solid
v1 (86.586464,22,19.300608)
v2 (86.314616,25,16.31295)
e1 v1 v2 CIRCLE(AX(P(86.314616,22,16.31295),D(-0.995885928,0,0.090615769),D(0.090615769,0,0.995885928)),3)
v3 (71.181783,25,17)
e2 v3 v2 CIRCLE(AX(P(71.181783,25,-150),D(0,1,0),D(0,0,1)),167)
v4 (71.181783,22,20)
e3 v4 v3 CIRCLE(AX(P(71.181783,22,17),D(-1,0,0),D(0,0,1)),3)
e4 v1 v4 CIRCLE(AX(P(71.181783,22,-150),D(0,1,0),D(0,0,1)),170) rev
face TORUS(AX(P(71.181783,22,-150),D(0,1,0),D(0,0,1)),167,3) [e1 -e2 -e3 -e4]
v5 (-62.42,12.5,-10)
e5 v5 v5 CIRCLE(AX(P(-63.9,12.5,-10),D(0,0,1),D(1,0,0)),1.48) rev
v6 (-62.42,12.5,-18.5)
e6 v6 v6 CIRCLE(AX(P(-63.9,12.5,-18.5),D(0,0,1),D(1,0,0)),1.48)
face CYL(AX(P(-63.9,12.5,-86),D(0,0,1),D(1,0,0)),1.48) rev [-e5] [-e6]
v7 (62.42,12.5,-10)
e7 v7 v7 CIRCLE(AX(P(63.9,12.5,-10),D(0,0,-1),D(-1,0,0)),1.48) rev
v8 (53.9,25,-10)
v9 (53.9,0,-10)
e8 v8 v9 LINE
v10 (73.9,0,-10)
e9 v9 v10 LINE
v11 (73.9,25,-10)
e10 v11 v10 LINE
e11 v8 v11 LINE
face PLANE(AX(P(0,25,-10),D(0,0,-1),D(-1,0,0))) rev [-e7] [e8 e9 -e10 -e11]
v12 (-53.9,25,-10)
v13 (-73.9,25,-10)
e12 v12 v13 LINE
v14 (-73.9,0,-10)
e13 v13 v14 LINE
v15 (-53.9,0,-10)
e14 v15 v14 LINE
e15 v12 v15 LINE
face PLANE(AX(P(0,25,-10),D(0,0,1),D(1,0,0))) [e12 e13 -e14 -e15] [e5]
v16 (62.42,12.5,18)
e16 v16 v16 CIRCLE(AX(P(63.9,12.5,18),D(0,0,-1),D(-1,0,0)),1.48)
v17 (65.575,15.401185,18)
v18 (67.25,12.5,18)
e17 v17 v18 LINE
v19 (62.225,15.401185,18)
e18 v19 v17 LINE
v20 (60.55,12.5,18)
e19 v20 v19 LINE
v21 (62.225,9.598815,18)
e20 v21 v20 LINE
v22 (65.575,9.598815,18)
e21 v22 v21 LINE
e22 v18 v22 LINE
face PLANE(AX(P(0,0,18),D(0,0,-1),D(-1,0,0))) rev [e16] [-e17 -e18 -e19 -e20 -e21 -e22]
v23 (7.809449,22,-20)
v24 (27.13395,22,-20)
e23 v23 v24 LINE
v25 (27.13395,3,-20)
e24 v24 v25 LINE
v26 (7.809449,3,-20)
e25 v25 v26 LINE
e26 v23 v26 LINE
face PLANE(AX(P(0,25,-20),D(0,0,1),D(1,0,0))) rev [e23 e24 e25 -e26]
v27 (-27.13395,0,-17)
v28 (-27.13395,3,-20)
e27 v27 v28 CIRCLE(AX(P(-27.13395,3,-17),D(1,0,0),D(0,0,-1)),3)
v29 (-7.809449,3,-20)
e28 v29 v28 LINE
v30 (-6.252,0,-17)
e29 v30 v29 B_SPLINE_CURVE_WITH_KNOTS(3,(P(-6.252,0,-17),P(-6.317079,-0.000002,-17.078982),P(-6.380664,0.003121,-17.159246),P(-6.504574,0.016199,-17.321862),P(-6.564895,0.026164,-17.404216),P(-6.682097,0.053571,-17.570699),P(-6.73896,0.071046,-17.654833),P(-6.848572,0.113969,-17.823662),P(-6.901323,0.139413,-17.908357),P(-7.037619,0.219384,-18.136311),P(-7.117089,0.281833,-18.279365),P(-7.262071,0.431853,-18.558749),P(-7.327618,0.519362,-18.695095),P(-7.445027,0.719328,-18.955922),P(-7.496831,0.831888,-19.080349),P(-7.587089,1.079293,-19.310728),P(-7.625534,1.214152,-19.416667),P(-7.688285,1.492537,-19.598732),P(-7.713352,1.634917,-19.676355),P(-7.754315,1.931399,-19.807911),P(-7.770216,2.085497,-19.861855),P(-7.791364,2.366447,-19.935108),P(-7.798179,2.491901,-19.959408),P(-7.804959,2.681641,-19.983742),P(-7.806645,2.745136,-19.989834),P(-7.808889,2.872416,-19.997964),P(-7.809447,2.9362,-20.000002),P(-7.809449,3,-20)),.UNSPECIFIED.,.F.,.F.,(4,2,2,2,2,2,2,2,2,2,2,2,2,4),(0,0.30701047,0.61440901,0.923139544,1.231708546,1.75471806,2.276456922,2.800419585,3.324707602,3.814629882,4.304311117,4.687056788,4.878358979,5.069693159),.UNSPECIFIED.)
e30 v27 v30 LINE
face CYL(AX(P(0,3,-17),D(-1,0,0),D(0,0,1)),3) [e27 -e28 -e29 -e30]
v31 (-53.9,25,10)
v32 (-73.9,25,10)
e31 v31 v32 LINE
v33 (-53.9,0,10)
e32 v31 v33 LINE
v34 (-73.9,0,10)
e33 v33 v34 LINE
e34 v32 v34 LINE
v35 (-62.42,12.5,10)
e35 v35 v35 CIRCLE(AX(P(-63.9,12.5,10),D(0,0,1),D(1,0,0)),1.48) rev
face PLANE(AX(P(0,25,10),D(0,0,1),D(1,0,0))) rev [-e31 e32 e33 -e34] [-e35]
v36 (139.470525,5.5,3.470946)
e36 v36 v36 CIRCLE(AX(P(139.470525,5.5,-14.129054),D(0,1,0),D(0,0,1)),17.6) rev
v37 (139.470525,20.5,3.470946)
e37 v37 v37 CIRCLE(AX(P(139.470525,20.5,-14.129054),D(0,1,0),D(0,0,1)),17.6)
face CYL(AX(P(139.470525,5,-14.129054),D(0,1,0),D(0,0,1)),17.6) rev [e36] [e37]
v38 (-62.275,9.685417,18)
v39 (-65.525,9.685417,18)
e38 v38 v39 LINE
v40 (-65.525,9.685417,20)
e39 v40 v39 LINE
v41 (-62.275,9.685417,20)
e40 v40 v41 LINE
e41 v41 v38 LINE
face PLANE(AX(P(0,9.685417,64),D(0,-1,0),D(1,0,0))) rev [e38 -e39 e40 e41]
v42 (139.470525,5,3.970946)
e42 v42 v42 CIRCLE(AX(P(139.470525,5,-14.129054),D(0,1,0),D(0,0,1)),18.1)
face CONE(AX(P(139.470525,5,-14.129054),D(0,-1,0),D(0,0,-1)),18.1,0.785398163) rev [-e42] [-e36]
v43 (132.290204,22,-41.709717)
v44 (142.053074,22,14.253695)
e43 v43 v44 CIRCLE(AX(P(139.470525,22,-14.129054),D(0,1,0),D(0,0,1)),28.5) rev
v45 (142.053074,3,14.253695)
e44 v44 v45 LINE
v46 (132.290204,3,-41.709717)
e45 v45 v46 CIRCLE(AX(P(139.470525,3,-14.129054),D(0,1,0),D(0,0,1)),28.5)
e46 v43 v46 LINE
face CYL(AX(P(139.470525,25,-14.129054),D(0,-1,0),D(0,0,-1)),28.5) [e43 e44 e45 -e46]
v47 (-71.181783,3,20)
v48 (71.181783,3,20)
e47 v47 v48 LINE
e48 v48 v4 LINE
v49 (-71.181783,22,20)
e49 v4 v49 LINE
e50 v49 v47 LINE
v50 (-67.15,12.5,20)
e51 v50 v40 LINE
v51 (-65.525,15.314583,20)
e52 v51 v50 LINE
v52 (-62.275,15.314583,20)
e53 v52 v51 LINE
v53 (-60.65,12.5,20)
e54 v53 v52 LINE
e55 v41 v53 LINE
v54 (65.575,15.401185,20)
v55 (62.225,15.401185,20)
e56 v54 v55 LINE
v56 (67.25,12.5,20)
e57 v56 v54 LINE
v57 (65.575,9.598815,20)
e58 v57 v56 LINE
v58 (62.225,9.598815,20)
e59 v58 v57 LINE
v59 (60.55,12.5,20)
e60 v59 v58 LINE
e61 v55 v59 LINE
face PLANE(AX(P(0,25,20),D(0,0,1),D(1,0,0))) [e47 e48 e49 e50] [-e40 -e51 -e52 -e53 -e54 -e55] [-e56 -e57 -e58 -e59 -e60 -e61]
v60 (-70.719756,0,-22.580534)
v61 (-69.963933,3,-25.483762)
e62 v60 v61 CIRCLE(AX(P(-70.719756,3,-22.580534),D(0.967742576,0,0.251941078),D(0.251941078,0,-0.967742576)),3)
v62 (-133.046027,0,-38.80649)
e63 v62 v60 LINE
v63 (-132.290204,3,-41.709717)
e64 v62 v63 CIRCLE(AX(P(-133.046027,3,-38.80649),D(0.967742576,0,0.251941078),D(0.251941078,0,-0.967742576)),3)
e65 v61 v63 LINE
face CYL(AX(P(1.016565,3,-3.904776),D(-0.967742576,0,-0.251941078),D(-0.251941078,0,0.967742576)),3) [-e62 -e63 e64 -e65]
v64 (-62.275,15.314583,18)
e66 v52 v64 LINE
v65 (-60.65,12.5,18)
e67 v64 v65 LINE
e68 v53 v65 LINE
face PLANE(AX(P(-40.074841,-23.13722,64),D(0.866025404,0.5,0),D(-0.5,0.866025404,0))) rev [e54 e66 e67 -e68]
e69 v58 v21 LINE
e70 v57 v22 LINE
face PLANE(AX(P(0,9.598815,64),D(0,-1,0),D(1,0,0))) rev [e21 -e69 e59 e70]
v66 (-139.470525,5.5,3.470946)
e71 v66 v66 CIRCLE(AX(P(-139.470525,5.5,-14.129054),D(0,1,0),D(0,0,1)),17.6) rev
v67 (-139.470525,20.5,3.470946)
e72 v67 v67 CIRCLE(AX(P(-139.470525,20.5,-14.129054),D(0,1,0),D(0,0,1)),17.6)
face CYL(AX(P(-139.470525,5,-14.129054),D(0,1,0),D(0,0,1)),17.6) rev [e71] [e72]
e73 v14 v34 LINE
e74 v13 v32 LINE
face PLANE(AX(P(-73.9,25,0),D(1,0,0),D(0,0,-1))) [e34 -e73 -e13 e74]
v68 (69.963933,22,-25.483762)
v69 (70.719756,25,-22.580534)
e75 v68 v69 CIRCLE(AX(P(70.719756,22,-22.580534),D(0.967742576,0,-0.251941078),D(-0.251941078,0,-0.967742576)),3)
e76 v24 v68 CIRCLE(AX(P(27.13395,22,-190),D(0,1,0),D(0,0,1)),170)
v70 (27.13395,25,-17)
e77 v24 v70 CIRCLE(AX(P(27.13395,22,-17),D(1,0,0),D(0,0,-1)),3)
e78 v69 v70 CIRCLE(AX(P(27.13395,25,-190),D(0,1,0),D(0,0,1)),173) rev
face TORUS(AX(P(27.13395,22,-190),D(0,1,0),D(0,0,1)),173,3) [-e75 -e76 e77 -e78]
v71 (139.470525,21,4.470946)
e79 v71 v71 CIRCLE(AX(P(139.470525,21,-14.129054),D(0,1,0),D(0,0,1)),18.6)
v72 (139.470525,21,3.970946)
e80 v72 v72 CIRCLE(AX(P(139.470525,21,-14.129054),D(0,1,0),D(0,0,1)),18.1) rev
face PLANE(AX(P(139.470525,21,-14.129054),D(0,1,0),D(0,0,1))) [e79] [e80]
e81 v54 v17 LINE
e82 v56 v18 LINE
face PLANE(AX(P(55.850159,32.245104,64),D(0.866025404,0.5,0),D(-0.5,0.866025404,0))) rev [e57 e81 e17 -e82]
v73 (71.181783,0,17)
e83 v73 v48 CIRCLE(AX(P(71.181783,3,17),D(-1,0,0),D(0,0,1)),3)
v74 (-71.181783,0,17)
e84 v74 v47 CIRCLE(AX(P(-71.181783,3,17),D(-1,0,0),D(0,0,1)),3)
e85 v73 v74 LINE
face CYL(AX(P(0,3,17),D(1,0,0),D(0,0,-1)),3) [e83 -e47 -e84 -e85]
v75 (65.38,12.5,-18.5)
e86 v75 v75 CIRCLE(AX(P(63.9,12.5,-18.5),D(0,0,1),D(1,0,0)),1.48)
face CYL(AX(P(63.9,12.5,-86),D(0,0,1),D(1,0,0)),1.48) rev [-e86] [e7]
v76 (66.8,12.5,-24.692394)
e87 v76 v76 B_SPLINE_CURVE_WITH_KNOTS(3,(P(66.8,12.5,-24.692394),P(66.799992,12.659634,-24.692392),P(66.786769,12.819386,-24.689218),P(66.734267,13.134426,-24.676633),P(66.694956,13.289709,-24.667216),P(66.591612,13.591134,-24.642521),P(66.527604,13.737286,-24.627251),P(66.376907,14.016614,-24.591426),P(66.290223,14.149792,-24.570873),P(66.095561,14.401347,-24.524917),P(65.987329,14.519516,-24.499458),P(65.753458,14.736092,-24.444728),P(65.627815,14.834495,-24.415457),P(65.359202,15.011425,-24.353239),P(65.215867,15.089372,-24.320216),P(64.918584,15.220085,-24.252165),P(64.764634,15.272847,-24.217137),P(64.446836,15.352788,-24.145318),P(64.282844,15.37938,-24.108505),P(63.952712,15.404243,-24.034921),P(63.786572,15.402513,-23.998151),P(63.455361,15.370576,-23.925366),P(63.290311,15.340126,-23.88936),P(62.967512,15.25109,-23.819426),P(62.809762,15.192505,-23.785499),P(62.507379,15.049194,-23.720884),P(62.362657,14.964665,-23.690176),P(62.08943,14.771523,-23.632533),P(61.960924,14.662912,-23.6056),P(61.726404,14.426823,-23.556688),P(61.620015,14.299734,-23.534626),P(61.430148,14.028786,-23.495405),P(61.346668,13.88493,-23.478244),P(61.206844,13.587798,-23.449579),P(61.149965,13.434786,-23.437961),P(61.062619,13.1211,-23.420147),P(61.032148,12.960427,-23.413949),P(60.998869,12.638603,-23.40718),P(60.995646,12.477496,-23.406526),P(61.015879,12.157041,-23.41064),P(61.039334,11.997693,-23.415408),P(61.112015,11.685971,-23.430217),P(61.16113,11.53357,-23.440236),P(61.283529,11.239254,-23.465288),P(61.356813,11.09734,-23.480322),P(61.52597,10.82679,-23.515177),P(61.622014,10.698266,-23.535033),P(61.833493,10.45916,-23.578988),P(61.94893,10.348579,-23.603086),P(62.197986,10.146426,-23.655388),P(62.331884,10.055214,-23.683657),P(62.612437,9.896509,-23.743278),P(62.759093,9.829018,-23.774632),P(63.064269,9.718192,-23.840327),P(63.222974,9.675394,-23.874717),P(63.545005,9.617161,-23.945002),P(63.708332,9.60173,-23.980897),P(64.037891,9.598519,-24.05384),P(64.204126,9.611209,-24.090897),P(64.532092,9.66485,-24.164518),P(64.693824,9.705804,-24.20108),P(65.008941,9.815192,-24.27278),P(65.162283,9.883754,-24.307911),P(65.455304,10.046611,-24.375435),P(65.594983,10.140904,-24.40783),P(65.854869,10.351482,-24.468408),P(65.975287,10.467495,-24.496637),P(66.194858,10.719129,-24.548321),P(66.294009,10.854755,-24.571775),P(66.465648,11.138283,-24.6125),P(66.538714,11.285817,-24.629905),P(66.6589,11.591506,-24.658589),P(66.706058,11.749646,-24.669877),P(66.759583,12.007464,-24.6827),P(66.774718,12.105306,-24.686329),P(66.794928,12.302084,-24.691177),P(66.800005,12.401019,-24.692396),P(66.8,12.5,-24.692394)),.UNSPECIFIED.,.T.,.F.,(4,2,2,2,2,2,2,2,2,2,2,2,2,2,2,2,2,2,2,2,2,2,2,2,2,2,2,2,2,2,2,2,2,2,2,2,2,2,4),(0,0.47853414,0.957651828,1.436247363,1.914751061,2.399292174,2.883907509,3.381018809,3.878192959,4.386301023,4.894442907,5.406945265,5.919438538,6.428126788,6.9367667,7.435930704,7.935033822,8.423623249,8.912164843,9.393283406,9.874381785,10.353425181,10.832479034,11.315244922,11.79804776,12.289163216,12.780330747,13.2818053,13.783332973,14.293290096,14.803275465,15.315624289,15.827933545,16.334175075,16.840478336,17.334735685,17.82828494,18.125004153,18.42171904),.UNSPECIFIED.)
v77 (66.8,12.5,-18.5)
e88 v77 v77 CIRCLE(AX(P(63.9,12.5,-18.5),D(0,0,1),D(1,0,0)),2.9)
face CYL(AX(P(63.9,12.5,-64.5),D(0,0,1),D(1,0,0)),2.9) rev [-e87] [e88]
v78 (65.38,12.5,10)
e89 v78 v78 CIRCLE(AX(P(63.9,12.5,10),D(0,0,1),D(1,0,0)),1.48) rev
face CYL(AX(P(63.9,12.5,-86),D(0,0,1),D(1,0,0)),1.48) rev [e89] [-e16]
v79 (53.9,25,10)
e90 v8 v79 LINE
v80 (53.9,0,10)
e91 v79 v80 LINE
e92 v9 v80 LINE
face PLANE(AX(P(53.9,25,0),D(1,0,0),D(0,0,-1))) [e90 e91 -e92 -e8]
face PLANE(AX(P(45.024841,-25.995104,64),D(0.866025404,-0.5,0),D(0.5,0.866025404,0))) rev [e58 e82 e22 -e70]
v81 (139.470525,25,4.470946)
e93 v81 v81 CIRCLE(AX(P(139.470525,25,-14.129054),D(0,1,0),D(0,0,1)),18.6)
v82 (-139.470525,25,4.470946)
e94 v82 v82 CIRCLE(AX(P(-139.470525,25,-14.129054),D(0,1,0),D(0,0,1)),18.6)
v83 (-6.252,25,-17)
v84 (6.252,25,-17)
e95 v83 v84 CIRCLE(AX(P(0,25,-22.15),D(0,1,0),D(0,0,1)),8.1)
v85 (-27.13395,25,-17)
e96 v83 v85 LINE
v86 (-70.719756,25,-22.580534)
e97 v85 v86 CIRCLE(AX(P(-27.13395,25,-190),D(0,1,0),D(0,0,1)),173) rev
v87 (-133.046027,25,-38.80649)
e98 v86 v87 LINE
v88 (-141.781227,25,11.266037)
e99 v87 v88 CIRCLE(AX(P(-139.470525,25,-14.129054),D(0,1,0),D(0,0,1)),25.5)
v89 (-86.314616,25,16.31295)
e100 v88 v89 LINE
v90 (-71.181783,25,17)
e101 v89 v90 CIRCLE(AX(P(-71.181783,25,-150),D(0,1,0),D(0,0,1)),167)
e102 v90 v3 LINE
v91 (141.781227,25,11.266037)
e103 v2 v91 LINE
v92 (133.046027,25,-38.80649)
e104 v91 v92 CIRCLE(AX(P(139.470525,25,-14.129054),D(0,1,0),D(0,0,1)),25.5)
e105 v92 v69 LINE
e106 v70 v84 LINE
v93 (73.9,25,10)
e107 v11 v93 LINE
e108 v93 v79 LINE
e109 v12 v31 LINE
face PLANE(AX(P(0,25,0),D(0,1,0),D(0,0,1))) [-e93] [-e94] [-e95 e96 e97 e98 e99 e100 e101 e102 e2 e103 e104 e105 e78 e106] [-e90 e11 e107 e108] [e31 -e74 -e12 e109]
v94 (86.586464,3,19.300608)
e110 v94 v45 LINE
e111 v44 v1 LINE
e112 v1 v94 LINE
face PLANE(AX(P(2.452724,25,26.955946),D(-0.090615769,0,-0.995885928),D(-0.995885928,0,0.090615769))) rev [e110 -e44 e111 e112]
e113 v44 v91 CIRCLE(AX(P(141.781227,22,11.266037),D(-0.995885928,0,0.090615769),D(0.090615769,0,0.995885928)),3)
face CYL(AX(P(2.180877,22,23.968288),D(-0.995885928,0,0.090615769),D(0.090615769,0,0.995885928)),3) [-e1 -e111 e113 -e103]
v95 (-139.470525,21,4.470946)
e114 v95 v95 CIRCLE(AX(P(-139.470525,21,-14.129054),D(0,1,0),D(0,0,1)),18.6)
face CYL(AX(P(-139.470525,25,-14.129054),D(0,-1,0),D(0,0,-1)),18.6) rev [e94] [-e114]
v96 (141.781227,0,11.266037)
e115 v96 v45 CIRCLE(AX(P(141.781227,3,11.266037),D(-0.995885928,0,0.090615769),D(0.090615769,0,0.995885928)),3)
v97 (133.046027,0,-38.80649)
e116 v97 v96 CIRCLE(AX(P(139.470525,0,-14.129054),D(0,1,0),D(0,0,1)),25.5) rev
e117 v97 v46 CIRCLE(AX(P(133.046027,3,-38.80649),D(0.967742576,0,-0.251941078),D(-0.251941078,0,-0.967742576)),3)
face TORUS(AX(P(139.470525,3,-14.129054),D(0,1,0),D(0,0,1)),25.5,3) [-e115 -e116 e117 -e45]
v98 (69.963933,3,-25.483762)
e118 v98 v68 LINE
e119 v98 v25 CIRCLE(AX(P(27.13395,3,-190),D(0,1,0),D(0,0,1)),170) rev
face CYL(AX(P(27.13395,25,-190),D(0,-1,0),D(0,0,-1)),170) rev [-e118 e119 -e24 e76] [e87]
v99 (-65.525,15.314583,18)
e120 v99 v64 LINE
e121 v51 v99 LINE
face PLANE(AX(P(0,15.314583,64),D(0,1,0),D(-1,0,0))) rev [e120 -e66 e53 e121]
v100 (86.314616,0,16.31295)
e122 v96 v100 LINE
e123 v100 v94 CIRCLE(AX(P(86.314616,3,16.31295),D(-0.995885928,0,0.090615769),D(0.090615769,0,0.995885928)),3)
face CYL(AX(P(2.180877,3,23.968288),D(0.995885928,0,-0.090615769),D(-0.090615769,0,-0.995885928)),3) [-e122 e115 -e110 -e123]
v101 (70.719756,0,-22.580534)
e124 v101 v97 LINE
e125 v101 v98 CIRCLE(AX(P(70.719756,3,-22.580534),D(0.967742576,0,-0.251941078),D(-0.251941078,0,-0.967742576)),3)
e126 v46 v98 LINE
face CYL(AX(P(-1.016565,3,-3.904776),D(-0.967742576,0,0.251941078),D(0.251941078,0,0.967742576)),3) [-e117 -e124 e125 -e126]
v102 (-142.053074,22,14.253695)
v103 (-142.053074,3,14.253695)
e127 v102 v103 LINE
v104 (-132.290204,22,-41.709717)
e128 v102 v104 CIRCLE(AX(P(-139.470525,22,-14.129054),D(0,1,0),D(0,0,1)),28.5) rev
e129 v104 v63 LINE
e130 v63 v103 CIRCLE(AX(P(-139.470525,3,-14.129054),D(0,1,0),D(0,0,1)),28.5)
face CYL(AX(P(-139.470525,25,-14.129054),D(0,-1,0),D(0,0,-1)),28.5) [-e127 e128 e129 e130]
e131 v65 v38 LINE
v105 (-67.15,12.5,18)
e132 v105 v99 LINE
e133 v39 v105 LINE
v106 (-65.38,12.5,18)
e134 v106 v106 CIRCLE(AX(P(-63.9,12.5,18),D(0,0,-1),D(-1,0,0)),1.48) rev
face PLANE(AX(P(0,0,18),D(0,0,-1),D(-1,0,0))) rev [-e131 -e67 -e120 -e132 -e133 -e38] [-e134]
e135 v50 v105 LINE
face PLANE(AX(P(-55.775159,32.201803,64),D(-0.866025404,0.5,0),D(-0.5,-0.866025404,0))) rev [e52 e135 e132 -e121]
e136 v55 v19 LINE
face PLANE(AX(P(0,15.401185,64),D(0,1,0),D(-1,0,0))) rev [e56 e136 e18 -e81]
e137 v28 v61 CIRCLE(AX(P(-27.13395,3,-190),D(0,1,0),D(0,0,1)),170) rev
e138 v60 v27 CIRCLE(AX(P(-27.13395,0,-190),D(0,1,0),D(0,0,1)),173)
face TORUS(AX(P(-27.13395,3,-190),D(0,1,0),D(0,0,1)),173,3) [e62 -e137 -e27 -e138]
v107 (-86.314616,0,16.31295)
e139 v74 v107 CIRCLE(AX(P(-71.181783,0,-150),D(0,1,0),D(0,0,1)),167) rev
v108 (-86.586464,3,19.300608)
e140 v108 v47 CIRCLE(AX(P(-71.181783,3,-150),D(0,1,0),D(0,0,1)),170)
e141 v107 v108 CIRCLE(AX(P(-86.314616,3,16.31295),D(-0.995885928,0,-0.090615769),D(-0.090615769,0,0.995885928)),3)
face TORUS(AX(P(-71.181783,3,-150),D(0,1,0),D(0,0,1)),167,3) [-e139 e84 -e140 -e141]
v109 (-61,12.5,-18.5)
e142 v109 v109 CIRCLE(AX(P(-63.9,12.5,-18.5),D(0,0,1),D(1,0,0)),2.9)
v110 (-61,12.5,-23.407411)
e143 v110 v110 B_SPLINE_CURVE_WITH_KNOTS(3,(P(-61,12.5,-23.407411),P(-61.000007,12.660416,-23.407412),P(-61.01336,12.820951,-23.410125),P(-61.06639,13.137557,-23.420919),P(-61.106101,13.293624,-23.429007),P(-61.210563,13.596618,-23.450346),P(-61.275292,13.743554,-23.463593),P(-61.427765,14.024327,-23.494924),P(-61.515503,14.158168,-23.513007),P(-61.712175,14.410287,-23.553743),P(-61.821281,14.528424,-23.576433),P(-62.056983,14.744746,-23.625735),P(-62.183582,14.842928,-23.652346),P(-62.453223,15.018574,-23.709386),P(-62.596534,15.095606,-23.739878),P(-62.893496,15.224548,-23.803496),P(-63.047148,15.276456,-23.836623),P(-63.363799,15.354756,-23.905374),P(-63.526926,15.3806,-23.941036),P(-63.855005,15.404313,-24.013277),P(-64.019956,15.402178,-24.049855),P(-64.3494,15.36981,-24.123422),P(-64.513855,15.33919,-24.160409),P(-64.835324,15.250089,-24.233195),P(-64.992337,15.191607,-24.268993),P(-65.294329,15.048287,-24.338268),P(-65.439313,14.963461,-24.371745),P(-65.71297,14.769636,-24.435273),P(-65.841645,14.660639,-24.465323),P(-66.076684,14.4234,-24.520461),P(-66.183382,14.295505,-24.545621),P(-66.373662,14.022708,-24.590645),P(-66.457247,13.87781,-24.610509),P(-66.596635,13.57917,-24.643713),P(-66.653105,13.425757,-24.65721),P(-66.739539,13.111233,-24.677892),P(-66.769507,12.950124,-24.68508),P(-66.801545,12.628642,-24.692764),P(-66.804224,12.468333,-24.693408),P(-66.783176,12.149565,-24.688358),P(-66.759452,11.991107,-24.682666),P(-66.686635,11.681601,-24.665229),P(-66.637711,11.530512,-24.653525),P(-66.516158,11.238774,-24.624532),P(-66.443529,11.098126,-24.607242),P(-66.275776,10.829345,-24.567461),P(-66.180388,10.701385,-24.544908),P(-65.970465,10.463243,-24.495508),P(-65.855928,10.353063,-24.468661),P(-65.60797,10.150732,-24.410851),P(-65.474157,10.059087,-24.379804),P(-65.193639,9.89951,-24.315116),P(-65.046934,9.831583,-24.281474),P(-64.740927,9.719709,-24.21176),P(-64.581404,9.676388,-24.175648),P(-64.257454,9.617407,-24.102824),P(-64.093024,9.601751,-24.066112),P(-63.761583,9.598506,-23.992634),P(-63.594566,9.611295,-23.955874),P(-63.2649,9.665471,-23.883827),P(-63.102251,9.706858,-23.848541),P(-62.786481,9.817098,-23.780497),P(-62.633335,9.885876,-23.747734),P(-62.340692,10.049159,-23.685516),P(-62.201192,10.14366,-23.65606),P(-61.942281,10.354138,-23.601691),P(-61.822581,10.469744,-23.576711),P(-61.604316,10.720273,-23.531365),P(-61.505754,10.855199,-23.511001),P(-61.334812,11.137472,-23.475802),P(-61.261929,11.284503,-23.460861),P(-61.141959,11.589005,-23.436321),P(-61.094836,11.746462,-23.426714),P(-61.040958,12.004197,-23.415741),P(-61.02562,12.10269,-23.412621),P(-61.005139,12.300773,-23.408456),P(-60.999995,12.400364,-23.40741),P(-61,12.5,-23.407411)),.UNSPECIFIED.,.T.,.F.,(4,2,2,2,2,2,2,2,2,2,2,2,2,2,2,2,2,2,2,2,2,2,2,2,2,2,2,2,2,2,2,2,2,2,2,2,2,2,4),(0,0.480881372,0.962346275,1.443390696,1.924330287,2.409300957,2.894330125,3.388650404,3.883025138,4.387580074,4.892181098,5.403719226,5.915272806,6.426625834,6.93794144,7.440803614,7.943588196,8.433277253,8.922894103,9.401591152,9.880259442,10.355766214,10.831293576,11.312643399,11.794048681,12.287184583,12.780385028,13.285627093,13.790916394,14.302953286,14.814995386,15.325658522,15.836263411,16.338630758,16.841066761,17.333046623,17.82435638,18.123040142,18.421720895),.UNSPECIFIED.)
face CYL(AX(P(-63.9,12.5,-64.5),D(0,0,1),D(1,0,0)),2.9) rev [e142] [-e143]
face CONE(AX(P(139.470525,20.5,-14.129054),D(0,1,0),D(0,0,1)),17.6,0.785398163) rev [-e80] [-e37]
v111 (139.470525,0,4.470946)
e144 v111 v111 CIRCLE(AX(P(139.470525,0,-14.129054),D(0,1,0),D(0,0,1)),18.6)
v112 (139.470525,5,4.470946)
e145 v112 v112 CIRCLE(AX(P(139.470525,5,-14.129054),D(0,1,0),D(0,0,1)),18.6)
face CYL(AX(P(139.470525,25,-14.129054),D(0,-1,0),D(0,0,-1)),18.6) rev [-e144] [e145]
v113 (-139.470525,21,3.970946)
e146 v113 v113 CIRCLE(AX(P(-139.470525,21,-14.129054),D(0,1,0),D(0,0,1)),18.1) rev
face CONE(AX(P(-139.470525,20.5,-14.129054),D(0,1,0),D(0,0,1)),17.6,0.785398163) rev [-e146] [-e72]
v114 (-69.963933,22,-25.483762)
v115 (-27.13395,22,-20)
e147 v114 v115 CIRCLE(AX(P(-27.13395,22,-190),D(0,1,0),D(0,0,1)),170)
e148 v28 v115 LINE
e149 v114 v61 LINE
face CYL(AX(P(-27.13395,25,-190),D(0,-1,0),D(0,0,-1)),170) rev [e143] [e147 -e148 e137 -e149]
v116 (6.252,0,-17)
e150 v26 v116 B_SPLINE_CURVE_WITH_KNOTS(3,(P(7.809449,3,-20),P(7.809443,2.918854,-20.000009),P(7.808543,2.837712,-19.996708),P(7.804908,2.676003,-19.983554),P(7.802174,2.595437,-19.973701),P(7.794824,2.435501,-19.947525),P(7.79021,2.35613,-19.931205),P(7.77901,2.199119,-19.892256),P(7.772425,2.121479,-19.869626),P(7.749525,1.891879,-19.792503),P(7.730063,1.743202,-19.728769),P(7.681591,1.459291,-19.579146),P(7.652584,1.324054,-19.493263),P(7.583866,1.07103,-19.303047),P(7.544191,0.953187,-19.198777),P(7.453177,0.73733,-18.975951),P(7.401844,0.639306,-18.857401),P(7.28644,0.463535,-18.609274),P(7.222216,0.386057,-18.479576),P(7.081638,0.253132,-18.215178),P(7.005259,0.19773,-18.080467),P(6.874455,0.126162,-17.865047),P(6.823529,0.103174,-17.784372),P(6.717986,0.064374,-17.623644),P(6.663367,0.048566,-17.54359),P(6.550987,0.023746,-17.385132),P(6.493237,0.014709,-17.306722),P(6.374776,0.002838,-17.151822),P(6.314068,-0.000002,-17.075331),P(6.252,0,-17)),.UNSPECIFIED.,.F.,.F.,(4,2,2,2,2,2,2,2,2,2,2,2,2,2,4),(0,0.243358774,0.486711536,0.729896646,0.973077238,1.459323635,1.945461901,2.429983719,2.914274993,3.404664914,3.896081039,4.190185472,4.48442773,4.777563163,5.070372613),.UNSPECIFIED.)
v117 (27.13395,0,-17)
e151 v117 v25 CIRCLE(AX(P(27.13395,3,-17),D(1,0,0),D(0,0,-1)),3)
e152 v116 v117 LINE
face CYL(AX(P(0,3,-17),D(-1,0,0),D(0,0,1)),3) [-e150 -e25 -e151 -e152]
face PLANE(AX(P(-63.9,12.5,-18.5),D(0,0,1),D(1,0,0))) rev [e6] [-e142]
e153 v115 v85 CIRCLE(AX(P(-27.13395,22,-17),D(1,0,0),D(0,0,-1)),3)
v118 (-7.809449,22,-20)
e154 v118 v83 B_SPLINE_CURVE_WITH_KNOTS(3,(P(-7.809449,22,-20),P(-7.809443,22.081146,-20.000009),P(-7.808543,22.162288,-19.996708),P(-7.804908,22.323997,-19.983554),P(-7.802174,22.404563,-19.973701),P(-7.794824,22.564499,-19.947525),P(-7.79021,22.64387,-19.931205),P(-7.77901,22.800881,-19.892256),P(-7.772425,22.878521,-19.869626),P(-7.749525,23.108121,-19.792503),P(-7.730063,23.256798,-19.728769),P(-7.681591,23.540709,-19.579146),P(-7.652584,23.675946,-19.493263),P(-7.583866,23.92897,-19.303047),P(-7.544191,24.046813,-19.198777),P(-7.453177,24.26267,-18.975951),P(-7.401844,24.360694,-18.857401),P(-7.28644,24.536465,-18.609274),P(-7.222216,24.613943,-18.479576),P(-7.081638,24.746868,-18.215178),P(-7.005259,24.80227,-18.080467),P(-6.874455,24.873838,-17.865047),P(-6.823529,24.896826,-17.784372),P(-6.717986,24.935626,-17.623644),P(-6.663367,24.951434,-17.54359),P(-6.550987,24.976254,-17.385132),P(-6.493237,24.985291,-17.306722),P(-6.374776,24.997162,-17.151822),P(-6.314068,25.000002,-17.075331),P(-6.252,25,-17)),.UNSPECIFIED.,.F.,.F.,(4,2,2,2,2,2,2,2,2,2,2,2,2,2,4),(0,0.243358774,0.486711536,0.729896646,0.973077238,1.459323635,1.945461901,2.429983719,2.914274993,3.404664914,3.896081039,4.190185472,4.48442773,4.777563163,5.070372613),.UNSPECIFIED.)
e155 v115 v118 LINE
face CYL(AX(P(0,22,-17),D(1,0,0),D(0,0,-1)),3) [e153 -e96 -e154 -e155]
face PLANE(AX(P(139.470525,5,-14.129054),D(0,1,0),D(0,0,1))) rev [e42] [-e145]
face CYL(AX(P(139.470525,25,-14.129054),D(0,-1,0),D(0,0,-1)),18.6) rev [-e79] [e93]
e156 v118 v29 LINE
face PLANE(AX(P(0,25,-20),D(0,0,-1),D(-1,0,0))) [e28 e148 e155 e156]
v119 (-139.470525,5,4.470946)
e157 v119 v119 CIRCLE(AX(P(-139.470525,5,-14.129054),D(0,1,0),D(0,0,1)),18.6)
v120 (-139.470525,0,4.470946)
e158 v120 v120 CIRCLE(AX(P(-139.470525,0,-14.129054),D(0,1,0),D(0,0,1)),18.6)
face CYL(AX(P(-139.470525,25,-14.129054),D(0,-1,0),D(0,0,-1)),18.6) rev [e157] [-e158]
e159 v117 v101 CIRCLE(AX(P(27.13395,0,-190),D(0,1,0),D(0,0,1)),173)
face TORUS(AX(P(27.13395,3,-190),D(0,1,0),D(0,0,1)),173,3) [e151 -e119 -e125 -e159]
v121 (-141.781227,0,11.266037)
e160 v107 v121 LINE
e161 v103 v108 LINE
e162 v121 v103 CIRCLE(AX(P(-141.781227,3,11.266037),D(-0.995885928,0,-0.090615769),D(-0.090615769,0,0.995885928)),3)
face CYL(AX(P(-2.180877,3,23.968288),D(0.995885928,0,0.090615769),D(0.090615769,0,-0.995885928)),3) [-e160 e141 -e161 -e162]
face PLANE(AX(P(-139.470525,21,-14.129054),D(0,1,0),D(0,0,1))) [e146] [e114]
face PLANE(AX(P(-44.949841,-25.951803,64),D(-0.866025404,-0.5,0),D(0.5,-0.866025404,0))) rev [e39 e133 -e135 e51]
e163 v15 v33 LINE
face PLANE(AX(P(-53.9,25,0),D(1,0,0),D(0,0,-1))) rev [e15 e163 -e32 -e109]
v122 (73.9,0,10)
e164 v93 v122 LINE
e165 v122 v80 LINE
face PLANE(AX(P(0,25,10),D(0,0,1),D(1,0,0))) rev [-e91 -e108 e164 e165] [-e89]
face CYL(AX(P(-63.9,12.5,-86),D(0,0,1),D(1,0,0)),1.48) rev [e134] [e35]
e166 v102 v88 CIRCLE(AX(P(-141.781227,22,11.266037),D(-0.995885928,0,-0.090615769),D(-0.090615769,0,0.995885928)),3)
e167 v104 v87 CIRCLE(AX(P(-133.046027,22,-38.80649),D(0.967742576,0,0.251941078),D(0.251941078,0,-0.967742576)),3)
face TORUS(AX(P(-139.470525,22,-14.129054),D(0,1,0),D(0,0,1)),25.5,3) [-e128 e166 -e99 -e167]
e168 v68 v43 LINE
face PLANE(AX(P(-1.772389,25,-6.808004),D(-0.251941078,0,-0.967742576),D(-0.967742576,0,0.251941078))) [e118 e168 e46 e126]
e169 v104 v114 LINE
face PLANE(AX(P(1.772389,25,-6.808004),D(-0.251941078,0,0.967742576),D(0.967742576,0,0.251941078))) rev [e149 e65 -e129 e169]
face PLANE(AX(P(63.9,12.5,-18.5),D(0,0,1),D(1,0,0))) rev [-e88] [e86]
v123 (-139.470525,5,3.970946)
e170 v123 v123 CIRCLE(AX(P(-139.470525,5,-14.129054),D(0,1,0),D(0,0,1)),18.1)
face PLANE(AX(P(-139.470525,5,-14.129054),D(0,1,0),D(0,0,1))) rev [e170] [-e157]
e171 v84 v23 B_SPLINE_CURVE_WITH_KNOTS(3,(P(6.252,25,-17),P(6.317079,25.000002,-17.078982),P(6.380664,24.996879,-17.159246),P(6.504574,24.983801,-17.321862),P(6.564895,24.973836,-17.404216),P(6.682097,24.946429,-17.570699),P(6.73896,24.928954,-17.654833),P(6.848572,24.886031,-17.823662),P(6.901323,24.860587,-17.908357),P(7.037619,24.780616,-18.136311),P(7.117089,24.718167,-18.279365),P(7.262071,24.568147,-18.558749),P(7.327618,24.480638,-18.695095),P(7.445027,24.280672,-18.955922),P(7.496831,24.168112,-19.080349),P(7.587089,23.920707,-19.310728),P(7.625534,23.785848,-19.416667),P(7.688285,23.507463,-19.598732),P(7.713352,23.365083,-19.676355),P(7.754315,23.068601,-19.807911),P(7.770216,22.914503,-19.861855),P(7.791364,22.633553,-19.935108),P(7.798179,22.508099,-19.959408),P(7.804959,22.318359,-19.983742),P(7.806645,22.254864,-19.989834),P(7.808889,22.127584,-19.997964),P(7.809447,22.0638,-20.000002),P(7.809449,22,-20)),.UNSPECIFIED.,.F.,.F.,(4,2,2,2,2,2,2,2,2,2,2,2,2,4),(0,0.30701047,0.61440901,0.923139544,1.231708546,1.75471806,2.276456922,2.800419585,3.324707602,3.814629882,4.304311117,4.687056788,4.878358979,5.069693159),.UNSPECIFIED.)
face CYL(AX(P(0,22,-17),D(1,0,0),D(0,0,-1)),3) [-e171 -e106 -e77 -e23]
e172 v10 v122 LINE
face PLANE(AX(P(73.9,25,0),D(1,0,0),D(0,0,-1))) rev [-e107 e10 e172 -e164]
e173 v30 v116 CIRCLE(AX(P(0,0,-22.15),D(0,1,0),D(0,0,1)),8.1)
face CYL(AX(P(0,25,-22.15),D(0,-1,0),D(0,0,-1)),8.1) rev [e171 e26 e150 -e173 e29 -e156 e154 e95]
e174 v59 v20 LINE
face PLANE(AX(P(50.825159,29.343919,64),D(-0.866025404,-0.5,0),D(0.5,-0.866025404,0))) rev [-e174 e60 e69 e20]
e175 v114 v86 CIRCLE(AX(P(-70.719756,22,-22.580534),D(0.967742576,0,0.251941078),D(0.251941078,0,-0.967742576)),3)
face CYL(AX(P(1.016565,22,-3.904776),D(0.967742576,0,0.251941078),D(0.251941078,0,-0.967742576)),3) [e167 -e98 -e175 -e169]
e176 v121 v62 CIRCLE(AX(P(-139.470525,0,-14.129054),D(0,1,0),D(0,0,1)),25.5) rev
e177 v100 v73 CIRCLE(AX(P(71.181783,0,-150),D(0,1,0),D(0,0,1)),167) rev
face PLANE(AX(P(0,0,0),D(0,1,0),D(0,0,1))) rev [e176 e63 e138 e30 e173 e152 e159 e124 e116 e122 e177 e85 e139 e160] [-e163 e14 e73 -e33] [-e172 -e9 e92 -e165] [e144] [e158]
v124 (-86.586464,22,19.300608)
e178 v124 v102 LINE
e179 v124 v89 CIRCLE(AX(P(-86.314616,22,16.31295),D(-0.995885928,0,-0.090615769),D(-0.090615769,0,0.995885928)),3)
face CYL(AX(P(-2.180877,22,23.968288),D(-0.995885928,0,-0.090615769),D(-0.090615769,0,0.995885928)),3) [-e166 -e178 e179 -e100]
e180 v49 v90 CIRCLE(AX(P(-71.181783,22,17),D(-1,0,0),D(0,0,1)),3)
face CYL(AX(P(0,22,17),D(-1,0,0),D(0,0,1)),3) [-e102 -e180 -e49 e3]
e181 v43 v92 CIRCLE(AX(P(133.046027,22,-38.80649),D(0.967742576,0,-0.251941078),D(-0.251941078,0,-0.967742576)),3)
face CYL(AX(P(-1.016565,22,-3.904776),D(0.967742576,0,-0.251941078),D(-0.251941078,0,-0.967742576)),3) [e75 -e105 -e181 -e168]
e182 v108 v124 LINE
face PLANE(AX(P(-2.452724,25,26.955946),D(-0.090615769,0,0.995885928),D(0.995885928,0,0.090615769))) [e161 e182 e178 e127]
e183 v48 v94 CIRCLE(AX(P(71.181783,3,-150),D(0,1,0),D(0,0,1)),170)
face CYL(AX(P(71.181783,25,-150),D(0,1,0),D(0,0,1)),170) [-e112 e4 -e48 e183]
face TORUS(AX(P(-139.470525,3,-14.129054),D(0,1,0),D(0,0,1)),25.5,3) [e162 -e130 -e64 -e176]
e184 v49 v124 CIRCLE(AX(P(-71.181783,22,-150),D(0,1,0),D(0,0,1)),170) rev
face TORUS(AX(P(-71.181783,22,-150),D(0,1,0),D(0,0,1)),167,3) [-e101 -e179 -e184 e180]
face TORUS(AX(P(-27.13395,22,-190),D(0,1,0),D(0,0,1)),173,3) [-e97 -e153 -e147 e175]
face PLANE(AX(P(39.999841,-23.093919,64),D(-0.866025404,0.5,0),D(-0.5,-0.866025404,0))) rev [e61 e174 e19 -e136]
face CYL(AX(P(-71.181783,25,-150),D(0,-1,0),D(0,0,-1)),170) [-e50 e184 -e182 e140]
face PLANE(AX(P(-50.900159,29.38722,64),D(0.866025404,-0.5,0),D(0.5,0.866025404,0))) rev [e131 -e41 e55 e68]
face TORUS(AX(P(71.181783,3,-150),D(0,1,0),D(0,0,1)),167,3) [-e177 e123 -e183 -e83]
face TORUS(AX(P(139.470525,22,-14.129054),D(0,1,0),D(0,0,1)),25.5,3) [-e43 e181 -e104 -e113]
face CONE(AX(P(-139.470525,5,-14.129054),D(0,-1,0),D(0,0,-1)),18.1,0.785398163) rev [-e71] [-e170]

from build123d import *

# Parameters (mm, degrees)
SKETCH1_W               = 20
SKETCH1_H               = 20
SKETCH1_R               = 18.6
BOSS_EXTRUDE1_DEPTH     = 25
FILLET1_R               = 170
FILLET2_R               = 170
FILLET3_R               = 3
BOSS_EXTRUDE2_START     = -20
SKETCH2_R               = 18.6
SKETCH2_R_2             = 17.6
BOSS_EXTRUDE2_DEPTH     = 16
CHAMFER1_SIZE           = 0.5
CUT_EXTRUDE1_DEPTH      = 96
CUT_EXTRUDE1_DEPTH_BACK = 16
CUT_EXTRUDE2_START      = -8.5
SKETCH4_R               = 2.9
CUT_EXTRUDE2_DEPTH      = 46
CUT_EXTRUDE3_START      = -8
SKETCH5_R               = 1.48
CUT_EXTRUDE3_DEPTH      = 46


with BuildPart() as part:
    # Sketch1 → Boss-Extrude1 (new body)
    with BuildSketch(Plane(origin=(0, 0, 0), x_dir=(1, 0, 0), z_dir=(0, 1, 0))):
        with BuildLine():
            Line((-78.9, -20), (78.9, -20))
            Line((78.9, -20), (142.053074305, -14.2536949))
            ThreePointArc((142.053074305, -14.2536949), (167.546506822, 19.026935088), (132.290205184, 41.709717738))
            Line((132.290205184, 41.709717738), (48.9, 20))
            Line((48.9, 20), (7.809449404, 20))
            ThreePointArc((7.809449404, 20), (0, 14.05), (-7.809449404, 20))
            Line((-7.809449404, 20), (-48.9, 20))
            Line((-48.9, 20), (-132.290204174, 41.709717475))
            ThreePointArc((-132.290204174, 41.709717475), (-167.546506732, 19.026935602), (-142.053074305, -14.2536949))
            Line((-142.053074305, -14.2536949), (-78.9, -20))
        make_face()
        with Locations((-63.9, 0)):
            Rectangle(SKETCH1_W, SKETCH1_H, mode=Mode.SUBTRACT)
        with Locations((63.9, 0)):
            Rectangle(SKETCH1_W, SKETCH1_H, mode=Mode.SUBTRACT)
        with Locations(Location((139.47052489, 14.12905406, 0), (0, 0, 270))):
            Circle(SKETCH1_R, mode=Mode.SUBTRACT)
        with Locations(Location((-139.47052489, 14.12905406, 0), (0, 0, 270))):
            Circle(SKETCH1_R, mode=Mode.SUBTRACT)
    extrude(amount=BOSS_EXTRUDE1_DEPTH)

    # Fillet1
    # the kernel refuses this fillet: 170 mm, written as the material it takes off along each edge
    with BuildSketch(Plane(origin=(78.9, -19.295542523, 20), x_dir=(-1, 0, 0), z_dir=(0, 1, 0)), Plane(origin=(-78.9, -19.295542523, 20), x_dir=(-0.995885928416444, 0, -0.09061576894844221), z_dir=(0, 1, 0))) as fillet1_piece_1:
        with BuildLine():
            CenterArc((FILLET1_R * 0.045401276525, -FILLET1_R), FILLET1_R, 90, 5.199032807)
            Line((-FILLET1_R * 0.0452144924234, -FILLET1_R * 0.00411407158356), (0, 0))
            Line((0, 0), (FILLET1_R * 0.045401276525, 0))
        make_face()
    extrude(amount=63.591085046, mode=Mode.SUBTRACT)

    # Fillet2
    fillet2_edges = [part.edges().sort_by_distance(p)[0] for p in [
        (-48.9, 12.5, -20),
        (48.9, 12.5, -20),
    ]]
    fillet(fillet2_edges, radius=FILLET2_R)

    # Fillet3
    fillet3_edges = [part.edges().sort_by_distance(p)[0] for p in [
        (48.723757294, 25, -21.376513431),
        (-48.723757294, 0, -21.376513431),
        (-48.723757294, 25, -21.376513431),
        (167.546506822, 25, -19.026935088),
        (-167.546506732, 0, -19.026935602),
        (167.546506822, 0, -19.026935088),
        (-167.546506732, 25, -19.026935602),
        (114.319769009, 0, 16.777151365),
        (114.319769009, 25, 16.777151365),
        (0, 0, 20),
        (-114.319769009, 0, 16.777151365),
        (-78.892057589, 0, 19.825061948),
        (78.892057589, 0, 19.825061948),
        (0, 25, 20),
        (-114.319769009, 25, 16.777151365),
        (-78.892057589, 25, 19.825061948),
        (78.892057589, 25, 19.825061948),
        (17.471699722, 0, -20),
        (17.471699722, 25, -20),
        (101.12706922, 0, -33.596739912),
        (101.12706922, 25, -33.596739912),
        (-101.127068716, 0, -33.59673978),
        (-101.127068716, 25, -33.59673978),
        (-17.471699722, 0, -20),
        (-17.471699722, 25, -20),
        (48.723757294, 0, -21.376513431),
    ]]
    fillet(fillet3_edges, radius=FILLET3_R)

    # Sketch2 → Boss-Extrude2 (add)
    # profile 1 of 2: a face of its own
    with BuildSketch(Plane(origin=(0, 25, 0), x_dir=(1, 0, 0), z_dir=(0, 1, 0)).offset(BOSS_EXTRUDE2_START)):
        with Locations(Location((139.47052489, 14.12905406, 0), (0, 0, 270))):
            Circle(SKETCH2_R)
        with Locations(Location((139.47052489, 14.12905406, 0), (0, 0, 270))):
            Circle(SKETCH2_R_2, mode=Mode.SUBTRACT)
    # profile 2 of 2: a face of its own
    with BuildSketch(Plane(origin=(0, 25, 0), x_dir=(1, 0, 0), z_dir=(0, 1, 0)).offset(BOSS_EXTRUDE2_START)):
        with Locations(Location((-139.47052489, 14.12905406, 0), (0, 0, 270))):
            Circle(SKETCH2_R)
        with Locations(Location((-139.47052489, 14.12905406, 0), (0, 0, 270))):
            Circle(SKETCH2_R_2, mode=Mode.SUBTRACT)
    extrude(amount=BOSS_EXTRUDE2_DEPTH)

    # Chamfer1
    chamfer1_edges = [part.edges().sort_by_distance(p)[0] for p in [
        (139.47052489, 5, -31.72905406),
        (139.47052489, 21, -31.72905406),
        (-139.47052489, 5, -31.72905406),
        (-139.47052489, 21, -31.72905406),
    ]]
    chamfer(chamfer1_edges, length=CHAMFER1_SIZE)

    # Sketch3 → Cut-Extrude1 (cut, two sides: drawn at the far end of the back side and taken through both)
    with BuildSketch(Plane(origin=(0, 0, 10), x_dir=(-1, 0, 0), z_dir=(0, 0, -1)).offset(-CUT_EXTRUDE1_DEPTH_BACK)):
        with BuildLine():
            ThreePointArc((65.38, 12.5), (63.9, 13.98), (62.42, 12.5))
            Line((62.42, 12.5), (65.38, 12.5))
        make_face()
        with BuildLine():
            Line((65.38, 12.5), (62.42, 12.5))
            ThreePointArc((62.42, 12.5), (63.9, 11.02), (65.38, 12.5))
        make_face()
        with BuildLine():
            ThreePointArc((-62.42, 12.5), (-63.9, 13.98), (-65.38, 12.5))
            Line((-65.38, 12.5), (-62.42, 12.5))
        make_face()
        with BuildLine():
            Line((-62.42, 12.5), (-65.38, 12.5))
            ThreePointArc((-65.38, 12.5), (-63.9, 11.02), (-62.42, 12.5))
        make_face()
    extrude(amount=CUT_EXTRUDE1_DEPTH + CUT_EXTRUDE1_DEPTH_BACK, mode=Mode.SUBTRACT)

    # Sketch4 → Cut-Extrude2 (cut)
    with BuildSketch(Plane.XY.offset(-10).offset(CUT_EXTRUDE2_START)):
        with Locations((-63.9, 12.5)):
            Circle(SKETCH4_R)
        with Locations((63.9, 12.5)):
            Circle(SKETCH4_R)
    extrude(amount=-CUT_EXTRUDE2_DEPTH, mode=Mode.SUBTRACT)

    # Sketch5 → Cut-Extrude3 (cut)
    # profile 1 of 2: a face of its own
    with BuildSketch(Plane(origin=(0, 0, 10), x_dir=(-1, 0, 0), z_dir=(0, 0, -1)).offset(CUT_EXTRUDE3_START)):
        Polygon((65.525, 15.314582562), (62.275, 15.314582562), (60.65, 12.5), (62.275, 9.685417438), (65.525, 9.685417438), (67.15, 12.5), align=None)
        with Locations(Location((63.9, 12.5, 0), (0, 0, 180))):
            Circle(SKETCH5_R, mode=Mode.SUBTRACT)
    # profile 2 of 2: a face of its own
    with BuildSketch(Plane(origin=(0, 0, 10), x_dir=(-1, 0, 0), z_dir=(0, 0, -1)).offset(CUT_EXTRUDE3_START)):
        Polygon((-62.225, 15.401185103), (-65.575, 15.401185103), (-67.25, 12.5), (-65.575, 9.598814897), (-62.225, 9.598814897), (-60.55, 12.5), align=None)
    extrude(amount=-CUT_EXTRUDE3_DEPTH, mode=Mode.SUBTRACT)


solid = part.part
